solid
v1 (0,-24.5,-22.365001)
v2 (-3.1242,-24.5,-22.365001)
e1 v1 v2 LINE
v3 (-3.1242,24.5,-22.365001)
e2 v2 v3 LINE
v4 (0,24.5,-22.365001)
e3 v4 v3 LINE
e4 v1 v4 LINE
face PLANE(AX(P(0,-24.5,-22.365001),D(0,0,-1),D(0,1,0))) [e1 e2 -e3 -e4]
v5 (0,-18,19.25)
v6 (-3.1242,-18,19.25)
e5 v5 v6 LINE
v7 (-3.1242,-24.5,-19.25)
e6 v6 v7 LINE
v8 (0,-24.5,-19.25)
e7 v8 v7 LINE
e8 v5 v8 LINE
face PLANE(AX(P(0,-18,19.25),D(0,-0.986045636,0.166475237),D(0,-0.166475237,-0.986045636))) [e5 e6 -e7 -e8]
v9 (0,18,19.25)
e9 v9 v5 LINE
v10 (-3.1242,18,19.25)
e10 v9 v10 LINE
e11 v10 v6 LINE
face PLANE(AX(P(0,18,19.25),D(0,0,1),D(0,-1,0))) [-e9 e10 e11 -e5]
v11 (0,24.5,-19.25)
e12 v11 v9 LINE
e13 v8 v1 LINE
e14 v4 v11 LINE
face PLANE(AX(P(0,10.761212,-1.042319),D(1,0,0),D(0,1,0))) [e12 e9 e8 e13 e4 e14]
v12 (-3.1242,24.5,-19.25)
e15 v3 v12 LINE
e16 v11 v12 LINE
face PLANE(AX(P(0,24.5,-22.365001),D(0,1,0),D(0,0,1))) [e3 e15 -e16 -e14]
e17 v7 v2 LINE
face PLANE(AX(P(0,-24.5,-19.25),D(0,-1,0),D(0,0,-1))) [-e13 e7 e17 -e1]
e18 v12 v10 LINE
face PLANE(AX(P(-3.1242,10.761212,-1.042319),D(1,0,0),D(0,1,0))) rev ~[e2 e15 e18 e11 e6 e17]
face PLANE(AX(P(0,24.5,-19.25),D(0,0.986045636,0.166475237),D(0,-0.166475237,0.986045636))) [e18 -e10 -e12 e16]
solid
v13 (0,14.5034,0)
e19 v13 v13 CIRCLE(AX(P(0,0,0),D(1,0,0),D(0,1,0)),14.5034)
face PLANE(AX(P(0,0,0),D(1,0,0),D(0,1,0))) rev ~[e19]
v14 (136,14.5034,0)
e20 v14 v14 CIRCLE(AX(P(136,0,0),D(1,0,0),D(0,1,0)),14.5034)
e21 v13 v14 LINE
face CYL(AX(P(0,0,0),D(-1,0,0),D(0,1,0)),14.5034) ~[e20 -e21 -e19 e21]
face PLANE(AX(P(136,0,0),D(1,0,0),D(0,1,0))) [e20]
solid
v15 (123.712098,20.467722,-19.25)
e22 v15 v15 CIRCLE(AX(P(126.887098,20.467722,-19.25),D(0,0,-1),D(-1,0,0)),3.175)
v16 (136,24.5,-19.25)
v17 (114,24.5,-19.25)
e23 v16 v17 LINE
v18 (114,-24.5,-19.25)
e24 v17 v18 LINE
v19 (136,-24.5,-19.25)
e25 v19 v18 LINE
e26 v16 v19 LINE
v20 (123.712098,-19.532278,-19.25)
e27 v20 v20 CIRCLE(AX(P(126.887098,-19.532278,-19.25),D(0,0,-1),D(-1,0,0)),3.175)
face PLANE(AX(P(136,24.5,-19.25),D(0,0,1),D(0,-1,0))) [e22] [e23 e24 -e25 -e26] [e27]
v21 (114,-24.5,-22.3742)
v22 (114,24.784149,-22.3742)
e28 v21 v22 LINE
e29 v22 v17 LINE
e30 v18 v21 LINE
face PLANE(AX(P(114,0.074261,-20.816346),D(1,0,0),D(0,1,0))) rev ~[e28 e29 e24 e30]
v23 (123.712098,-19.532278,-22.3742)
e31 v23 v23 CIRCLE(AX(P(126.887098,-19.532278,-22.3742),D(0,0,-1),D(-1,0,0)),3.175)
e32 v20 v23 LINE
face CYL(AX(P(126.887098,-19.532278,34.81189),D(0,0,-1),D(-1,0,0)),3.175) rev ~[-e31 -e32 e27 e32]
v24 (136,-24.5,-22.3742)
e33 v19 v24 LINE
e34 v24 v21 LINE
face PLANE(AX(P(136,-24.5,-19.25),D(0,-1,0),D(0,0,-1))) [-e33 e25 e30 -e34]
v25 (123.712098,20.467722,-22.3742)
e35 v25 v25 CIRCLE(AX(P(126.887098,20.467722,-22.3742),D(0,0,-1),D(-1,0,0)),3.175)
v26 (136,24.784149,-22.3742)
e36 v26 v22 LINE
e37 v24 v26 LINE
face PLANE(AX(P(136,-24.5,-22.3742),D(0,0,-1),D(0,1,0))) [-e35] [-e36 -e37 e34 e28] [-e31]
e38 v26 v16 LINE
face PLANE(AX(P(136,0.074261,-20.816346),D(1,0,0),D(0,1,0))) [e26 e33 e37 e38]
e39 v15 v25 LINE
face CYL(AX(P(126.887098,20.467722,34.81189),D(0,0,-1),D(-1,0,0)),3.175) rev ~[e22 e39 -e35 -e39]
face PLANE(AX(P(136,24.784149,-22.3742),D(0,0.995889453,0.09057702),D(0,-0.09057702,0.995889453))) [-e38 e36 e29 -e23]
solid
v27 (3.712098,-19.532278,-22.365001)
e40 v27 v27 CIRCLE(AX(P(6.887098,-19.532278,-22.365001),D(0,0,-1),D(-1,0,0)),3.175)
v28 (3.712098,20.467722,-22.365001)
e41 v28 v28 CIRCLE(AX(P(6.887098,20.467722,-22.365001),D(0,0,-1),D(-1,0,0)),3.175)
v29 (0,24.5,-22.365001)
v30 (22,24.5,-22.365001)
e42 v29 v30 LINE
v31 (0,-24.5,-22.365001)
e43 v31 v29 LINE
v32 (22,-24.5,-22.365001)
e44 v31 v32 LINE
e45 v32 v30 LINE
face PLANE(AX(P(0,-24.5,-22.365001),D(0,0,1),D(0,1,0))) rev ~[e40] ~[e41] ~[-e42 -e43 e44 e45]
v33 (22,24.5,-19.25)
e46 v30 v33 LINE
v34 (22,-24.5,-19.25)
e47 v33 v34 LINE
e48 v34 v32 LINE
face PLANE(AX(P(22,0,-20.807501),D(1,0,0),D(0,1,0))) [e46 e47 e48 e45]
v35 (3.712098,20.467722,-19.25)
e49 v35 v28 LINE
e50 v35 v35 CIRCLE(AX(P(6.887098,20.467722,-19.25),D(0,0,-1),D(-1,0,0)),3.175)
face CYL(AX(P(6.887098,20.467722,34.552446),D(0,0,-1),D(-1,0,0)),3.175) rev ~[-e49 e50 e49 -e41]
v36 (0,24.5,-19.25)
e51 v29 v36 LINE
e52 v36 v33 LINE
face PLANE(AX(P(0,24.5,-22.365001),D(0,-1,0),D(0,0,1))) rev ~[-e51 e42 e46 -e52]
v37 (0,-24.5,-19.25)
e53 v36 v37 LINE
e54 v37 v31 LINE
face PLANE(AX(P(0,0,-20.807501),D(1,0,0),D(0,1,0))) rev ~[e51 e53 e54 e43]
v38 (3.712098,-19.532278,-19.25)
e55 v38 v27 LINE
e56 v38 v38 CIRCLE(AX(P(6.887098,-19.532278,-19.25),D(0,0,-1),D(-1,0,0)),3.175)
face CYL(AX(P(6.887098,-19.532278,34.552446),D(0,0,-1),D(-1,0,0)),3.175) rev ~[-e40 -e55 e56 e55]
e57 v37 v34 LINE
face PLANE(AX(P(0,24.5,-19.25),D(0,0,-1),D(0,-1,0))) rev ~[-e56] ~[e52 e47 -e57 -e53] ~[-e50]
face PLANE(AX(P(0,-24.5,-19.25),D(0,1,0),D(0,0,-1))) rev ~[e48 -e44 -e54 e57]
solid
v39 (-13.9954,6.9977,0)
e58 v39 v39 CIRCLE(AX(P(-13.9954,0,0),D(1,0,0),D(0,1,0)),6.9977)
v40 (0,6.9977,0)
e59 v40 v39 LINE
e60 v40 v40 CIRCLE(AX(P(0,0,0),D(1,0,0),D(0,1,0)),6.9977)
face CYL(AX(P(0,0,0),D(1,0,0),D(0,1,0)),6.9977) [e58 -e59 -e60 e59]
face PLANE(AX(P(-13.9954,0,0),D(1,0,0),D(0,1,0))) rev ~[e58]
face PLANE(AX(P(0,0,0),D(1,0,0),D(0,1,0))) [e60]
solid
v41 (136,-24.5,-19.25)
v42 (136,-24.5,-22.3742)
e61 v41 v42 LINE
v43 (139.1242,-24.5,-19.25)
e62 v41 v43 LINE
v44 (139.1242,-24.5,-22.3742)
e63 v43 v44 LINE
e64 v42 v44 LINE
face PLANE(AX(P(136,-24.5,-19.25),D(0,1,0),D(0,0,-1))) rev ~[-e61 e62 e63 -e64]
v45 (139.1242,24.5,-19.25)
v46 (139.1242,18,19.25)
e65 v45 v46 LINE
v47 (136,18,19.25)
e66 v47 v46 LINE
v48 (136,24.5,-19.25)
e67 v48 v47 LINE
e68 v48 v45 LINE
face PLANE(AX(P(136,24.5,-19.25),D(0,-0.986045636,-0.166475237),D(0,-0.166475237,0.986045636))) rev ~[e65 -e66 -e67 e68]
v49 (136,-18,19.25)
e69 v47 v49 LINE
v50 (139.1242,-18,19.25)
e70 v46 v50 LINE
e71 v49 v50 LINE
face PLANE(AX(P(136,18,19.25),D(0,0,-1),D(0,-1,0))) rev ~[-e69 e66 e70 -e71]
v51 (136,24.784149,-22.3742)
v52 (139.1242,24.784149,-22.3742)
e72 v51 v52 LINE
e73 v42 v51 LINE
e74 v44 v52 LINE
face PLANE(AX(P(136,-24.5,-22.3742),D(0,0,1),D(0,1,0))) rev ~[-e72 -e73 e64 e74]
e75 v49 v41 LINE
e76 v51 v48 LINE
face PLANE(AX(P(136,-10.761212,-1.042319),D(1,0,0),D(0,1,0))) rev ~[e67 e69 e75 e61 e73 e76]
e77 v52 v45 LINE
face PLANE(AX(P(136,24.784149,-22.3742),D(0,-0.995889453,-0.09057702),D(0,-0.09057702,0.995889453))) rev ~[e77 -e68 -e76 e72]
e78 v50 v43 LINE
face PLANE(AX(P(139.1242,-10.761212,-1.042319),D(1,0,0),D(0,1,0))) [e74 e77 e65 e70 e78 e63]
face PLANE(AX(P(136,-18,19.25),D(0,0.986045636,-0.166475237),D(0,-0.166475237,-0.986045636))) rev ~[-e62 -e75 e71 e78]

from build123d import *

# Parameters (mm, degrees)
F0_R      = 14.5034
F1_DEPTH  = 136
F2_R      = 6.9977
F3_DEPTH  = 13.9954
F5_DEPTH  = 22
F8_DEPTH  = 22
F9_DEPTH  = 3.1242
F11_DEPTH = 3.1242
F13_D     = 6.35
F13_2_D   = 6.35


# Not quite as in the source:
# - a feature names something its author has since deleted; it is built from what else it names


with BuildPart() as f1:
    # F0 (on Right) → F1 (new body)
    with BuildSketch(Plane.YZ):
        Circle(F0_R)
    extrude(amount=F1_DEPTH)


with BuildPart() as f3:
    # F2 (on Right) → F3 (new body)
    with BuildSketch(Plane.YZ):
        Circle(F2_R)
    extrude(amount=-F3_DEPTH)


with BuildPart() as f5:
    # F4 (on Right) → F5 (new body)
    with BuildSketch(Plane.YZ):
        Polygon((24.5, -19.25), (0, -19.25), (-24.5, -19.25), (-24.5, -22.3650014941), (24.5, -22.3650014941), align=None)
    extrude(amount=F5_DEPTH)

    # F13 (through all)
    with Locations(Plane.XY.offset(-19.25)):
        with Locations((6.8870979548, -19.5322781801), (6.8870979548, 20.4677218199), (126.8870979548, 20.4677218199), (126.8870979548, -19.5322781801)):
            Hole(F13_D / 2)


with BuildPart() as f8:
    # F7 (on offset) → F8 (new body)
    with BuildSketch(Plane.YZ.offset(136)):
        Polygon((0, -19.25), (-24.5, -19.25), (-24.5, -22.3742), (24.7841487321, -22.3742), (24.5, -19.25), align=None)
    extrude(amount=-F8_DEPTH)

    # F13#2 (through all)
    with Locations(Plane.XY.offset(-19.25)):
        with Locations((6.8870979548, -19.5322781801), (6.8870979548, 20.4677218199), (126.8870979548, 20.4677218199), (126.8870979548, -19.5322781801)):
            Hole(F13_2_D / 2)


with BuildPart() as f9:
    # F7 (on offset) → F9 (new body)
    with BuildSketch(Plane.YZ.offset(136)):
        Polygon((0, 19.25), (-18, 19.25), (-24.5, -19.25), (0, -19.25), align=None)
        Polygon((18, 19.25), (0, 19.25), (0, -19.25), (24.5, -19.25), align=None)
        Polygon((0, -19.25), (-24.5, -19.25), (-24.5, -22.3742), (24.7841487321, -22.3742), (24.5, -19.25), align=None)
    extrude(amount=F9_DEPTH)


with BuildPart() as f11:
    # F4 (on Right) → F11 (new body)
    with BuildSketch(Plane.YZ):
        Polygon((18, 19.25), (0, 19.25), (0, -19.25), (24.5, -19.25), align=None)
        Polygon((0, -19.25), (0, 19.25), (-18, 19.25), (-24.5, -19.25), align=None)
        Polygon((24.5, -19.25), (0, -19.25), (-24.5, -19.25), (-24.5, -22.3650014941), (24.5, -22.3650014941), align=None)
    extrude(amount=-F11_DEPTH)


solid = Compound([f1.part, f3.part, f5.part, f8.part, f9.part, f11.part])
